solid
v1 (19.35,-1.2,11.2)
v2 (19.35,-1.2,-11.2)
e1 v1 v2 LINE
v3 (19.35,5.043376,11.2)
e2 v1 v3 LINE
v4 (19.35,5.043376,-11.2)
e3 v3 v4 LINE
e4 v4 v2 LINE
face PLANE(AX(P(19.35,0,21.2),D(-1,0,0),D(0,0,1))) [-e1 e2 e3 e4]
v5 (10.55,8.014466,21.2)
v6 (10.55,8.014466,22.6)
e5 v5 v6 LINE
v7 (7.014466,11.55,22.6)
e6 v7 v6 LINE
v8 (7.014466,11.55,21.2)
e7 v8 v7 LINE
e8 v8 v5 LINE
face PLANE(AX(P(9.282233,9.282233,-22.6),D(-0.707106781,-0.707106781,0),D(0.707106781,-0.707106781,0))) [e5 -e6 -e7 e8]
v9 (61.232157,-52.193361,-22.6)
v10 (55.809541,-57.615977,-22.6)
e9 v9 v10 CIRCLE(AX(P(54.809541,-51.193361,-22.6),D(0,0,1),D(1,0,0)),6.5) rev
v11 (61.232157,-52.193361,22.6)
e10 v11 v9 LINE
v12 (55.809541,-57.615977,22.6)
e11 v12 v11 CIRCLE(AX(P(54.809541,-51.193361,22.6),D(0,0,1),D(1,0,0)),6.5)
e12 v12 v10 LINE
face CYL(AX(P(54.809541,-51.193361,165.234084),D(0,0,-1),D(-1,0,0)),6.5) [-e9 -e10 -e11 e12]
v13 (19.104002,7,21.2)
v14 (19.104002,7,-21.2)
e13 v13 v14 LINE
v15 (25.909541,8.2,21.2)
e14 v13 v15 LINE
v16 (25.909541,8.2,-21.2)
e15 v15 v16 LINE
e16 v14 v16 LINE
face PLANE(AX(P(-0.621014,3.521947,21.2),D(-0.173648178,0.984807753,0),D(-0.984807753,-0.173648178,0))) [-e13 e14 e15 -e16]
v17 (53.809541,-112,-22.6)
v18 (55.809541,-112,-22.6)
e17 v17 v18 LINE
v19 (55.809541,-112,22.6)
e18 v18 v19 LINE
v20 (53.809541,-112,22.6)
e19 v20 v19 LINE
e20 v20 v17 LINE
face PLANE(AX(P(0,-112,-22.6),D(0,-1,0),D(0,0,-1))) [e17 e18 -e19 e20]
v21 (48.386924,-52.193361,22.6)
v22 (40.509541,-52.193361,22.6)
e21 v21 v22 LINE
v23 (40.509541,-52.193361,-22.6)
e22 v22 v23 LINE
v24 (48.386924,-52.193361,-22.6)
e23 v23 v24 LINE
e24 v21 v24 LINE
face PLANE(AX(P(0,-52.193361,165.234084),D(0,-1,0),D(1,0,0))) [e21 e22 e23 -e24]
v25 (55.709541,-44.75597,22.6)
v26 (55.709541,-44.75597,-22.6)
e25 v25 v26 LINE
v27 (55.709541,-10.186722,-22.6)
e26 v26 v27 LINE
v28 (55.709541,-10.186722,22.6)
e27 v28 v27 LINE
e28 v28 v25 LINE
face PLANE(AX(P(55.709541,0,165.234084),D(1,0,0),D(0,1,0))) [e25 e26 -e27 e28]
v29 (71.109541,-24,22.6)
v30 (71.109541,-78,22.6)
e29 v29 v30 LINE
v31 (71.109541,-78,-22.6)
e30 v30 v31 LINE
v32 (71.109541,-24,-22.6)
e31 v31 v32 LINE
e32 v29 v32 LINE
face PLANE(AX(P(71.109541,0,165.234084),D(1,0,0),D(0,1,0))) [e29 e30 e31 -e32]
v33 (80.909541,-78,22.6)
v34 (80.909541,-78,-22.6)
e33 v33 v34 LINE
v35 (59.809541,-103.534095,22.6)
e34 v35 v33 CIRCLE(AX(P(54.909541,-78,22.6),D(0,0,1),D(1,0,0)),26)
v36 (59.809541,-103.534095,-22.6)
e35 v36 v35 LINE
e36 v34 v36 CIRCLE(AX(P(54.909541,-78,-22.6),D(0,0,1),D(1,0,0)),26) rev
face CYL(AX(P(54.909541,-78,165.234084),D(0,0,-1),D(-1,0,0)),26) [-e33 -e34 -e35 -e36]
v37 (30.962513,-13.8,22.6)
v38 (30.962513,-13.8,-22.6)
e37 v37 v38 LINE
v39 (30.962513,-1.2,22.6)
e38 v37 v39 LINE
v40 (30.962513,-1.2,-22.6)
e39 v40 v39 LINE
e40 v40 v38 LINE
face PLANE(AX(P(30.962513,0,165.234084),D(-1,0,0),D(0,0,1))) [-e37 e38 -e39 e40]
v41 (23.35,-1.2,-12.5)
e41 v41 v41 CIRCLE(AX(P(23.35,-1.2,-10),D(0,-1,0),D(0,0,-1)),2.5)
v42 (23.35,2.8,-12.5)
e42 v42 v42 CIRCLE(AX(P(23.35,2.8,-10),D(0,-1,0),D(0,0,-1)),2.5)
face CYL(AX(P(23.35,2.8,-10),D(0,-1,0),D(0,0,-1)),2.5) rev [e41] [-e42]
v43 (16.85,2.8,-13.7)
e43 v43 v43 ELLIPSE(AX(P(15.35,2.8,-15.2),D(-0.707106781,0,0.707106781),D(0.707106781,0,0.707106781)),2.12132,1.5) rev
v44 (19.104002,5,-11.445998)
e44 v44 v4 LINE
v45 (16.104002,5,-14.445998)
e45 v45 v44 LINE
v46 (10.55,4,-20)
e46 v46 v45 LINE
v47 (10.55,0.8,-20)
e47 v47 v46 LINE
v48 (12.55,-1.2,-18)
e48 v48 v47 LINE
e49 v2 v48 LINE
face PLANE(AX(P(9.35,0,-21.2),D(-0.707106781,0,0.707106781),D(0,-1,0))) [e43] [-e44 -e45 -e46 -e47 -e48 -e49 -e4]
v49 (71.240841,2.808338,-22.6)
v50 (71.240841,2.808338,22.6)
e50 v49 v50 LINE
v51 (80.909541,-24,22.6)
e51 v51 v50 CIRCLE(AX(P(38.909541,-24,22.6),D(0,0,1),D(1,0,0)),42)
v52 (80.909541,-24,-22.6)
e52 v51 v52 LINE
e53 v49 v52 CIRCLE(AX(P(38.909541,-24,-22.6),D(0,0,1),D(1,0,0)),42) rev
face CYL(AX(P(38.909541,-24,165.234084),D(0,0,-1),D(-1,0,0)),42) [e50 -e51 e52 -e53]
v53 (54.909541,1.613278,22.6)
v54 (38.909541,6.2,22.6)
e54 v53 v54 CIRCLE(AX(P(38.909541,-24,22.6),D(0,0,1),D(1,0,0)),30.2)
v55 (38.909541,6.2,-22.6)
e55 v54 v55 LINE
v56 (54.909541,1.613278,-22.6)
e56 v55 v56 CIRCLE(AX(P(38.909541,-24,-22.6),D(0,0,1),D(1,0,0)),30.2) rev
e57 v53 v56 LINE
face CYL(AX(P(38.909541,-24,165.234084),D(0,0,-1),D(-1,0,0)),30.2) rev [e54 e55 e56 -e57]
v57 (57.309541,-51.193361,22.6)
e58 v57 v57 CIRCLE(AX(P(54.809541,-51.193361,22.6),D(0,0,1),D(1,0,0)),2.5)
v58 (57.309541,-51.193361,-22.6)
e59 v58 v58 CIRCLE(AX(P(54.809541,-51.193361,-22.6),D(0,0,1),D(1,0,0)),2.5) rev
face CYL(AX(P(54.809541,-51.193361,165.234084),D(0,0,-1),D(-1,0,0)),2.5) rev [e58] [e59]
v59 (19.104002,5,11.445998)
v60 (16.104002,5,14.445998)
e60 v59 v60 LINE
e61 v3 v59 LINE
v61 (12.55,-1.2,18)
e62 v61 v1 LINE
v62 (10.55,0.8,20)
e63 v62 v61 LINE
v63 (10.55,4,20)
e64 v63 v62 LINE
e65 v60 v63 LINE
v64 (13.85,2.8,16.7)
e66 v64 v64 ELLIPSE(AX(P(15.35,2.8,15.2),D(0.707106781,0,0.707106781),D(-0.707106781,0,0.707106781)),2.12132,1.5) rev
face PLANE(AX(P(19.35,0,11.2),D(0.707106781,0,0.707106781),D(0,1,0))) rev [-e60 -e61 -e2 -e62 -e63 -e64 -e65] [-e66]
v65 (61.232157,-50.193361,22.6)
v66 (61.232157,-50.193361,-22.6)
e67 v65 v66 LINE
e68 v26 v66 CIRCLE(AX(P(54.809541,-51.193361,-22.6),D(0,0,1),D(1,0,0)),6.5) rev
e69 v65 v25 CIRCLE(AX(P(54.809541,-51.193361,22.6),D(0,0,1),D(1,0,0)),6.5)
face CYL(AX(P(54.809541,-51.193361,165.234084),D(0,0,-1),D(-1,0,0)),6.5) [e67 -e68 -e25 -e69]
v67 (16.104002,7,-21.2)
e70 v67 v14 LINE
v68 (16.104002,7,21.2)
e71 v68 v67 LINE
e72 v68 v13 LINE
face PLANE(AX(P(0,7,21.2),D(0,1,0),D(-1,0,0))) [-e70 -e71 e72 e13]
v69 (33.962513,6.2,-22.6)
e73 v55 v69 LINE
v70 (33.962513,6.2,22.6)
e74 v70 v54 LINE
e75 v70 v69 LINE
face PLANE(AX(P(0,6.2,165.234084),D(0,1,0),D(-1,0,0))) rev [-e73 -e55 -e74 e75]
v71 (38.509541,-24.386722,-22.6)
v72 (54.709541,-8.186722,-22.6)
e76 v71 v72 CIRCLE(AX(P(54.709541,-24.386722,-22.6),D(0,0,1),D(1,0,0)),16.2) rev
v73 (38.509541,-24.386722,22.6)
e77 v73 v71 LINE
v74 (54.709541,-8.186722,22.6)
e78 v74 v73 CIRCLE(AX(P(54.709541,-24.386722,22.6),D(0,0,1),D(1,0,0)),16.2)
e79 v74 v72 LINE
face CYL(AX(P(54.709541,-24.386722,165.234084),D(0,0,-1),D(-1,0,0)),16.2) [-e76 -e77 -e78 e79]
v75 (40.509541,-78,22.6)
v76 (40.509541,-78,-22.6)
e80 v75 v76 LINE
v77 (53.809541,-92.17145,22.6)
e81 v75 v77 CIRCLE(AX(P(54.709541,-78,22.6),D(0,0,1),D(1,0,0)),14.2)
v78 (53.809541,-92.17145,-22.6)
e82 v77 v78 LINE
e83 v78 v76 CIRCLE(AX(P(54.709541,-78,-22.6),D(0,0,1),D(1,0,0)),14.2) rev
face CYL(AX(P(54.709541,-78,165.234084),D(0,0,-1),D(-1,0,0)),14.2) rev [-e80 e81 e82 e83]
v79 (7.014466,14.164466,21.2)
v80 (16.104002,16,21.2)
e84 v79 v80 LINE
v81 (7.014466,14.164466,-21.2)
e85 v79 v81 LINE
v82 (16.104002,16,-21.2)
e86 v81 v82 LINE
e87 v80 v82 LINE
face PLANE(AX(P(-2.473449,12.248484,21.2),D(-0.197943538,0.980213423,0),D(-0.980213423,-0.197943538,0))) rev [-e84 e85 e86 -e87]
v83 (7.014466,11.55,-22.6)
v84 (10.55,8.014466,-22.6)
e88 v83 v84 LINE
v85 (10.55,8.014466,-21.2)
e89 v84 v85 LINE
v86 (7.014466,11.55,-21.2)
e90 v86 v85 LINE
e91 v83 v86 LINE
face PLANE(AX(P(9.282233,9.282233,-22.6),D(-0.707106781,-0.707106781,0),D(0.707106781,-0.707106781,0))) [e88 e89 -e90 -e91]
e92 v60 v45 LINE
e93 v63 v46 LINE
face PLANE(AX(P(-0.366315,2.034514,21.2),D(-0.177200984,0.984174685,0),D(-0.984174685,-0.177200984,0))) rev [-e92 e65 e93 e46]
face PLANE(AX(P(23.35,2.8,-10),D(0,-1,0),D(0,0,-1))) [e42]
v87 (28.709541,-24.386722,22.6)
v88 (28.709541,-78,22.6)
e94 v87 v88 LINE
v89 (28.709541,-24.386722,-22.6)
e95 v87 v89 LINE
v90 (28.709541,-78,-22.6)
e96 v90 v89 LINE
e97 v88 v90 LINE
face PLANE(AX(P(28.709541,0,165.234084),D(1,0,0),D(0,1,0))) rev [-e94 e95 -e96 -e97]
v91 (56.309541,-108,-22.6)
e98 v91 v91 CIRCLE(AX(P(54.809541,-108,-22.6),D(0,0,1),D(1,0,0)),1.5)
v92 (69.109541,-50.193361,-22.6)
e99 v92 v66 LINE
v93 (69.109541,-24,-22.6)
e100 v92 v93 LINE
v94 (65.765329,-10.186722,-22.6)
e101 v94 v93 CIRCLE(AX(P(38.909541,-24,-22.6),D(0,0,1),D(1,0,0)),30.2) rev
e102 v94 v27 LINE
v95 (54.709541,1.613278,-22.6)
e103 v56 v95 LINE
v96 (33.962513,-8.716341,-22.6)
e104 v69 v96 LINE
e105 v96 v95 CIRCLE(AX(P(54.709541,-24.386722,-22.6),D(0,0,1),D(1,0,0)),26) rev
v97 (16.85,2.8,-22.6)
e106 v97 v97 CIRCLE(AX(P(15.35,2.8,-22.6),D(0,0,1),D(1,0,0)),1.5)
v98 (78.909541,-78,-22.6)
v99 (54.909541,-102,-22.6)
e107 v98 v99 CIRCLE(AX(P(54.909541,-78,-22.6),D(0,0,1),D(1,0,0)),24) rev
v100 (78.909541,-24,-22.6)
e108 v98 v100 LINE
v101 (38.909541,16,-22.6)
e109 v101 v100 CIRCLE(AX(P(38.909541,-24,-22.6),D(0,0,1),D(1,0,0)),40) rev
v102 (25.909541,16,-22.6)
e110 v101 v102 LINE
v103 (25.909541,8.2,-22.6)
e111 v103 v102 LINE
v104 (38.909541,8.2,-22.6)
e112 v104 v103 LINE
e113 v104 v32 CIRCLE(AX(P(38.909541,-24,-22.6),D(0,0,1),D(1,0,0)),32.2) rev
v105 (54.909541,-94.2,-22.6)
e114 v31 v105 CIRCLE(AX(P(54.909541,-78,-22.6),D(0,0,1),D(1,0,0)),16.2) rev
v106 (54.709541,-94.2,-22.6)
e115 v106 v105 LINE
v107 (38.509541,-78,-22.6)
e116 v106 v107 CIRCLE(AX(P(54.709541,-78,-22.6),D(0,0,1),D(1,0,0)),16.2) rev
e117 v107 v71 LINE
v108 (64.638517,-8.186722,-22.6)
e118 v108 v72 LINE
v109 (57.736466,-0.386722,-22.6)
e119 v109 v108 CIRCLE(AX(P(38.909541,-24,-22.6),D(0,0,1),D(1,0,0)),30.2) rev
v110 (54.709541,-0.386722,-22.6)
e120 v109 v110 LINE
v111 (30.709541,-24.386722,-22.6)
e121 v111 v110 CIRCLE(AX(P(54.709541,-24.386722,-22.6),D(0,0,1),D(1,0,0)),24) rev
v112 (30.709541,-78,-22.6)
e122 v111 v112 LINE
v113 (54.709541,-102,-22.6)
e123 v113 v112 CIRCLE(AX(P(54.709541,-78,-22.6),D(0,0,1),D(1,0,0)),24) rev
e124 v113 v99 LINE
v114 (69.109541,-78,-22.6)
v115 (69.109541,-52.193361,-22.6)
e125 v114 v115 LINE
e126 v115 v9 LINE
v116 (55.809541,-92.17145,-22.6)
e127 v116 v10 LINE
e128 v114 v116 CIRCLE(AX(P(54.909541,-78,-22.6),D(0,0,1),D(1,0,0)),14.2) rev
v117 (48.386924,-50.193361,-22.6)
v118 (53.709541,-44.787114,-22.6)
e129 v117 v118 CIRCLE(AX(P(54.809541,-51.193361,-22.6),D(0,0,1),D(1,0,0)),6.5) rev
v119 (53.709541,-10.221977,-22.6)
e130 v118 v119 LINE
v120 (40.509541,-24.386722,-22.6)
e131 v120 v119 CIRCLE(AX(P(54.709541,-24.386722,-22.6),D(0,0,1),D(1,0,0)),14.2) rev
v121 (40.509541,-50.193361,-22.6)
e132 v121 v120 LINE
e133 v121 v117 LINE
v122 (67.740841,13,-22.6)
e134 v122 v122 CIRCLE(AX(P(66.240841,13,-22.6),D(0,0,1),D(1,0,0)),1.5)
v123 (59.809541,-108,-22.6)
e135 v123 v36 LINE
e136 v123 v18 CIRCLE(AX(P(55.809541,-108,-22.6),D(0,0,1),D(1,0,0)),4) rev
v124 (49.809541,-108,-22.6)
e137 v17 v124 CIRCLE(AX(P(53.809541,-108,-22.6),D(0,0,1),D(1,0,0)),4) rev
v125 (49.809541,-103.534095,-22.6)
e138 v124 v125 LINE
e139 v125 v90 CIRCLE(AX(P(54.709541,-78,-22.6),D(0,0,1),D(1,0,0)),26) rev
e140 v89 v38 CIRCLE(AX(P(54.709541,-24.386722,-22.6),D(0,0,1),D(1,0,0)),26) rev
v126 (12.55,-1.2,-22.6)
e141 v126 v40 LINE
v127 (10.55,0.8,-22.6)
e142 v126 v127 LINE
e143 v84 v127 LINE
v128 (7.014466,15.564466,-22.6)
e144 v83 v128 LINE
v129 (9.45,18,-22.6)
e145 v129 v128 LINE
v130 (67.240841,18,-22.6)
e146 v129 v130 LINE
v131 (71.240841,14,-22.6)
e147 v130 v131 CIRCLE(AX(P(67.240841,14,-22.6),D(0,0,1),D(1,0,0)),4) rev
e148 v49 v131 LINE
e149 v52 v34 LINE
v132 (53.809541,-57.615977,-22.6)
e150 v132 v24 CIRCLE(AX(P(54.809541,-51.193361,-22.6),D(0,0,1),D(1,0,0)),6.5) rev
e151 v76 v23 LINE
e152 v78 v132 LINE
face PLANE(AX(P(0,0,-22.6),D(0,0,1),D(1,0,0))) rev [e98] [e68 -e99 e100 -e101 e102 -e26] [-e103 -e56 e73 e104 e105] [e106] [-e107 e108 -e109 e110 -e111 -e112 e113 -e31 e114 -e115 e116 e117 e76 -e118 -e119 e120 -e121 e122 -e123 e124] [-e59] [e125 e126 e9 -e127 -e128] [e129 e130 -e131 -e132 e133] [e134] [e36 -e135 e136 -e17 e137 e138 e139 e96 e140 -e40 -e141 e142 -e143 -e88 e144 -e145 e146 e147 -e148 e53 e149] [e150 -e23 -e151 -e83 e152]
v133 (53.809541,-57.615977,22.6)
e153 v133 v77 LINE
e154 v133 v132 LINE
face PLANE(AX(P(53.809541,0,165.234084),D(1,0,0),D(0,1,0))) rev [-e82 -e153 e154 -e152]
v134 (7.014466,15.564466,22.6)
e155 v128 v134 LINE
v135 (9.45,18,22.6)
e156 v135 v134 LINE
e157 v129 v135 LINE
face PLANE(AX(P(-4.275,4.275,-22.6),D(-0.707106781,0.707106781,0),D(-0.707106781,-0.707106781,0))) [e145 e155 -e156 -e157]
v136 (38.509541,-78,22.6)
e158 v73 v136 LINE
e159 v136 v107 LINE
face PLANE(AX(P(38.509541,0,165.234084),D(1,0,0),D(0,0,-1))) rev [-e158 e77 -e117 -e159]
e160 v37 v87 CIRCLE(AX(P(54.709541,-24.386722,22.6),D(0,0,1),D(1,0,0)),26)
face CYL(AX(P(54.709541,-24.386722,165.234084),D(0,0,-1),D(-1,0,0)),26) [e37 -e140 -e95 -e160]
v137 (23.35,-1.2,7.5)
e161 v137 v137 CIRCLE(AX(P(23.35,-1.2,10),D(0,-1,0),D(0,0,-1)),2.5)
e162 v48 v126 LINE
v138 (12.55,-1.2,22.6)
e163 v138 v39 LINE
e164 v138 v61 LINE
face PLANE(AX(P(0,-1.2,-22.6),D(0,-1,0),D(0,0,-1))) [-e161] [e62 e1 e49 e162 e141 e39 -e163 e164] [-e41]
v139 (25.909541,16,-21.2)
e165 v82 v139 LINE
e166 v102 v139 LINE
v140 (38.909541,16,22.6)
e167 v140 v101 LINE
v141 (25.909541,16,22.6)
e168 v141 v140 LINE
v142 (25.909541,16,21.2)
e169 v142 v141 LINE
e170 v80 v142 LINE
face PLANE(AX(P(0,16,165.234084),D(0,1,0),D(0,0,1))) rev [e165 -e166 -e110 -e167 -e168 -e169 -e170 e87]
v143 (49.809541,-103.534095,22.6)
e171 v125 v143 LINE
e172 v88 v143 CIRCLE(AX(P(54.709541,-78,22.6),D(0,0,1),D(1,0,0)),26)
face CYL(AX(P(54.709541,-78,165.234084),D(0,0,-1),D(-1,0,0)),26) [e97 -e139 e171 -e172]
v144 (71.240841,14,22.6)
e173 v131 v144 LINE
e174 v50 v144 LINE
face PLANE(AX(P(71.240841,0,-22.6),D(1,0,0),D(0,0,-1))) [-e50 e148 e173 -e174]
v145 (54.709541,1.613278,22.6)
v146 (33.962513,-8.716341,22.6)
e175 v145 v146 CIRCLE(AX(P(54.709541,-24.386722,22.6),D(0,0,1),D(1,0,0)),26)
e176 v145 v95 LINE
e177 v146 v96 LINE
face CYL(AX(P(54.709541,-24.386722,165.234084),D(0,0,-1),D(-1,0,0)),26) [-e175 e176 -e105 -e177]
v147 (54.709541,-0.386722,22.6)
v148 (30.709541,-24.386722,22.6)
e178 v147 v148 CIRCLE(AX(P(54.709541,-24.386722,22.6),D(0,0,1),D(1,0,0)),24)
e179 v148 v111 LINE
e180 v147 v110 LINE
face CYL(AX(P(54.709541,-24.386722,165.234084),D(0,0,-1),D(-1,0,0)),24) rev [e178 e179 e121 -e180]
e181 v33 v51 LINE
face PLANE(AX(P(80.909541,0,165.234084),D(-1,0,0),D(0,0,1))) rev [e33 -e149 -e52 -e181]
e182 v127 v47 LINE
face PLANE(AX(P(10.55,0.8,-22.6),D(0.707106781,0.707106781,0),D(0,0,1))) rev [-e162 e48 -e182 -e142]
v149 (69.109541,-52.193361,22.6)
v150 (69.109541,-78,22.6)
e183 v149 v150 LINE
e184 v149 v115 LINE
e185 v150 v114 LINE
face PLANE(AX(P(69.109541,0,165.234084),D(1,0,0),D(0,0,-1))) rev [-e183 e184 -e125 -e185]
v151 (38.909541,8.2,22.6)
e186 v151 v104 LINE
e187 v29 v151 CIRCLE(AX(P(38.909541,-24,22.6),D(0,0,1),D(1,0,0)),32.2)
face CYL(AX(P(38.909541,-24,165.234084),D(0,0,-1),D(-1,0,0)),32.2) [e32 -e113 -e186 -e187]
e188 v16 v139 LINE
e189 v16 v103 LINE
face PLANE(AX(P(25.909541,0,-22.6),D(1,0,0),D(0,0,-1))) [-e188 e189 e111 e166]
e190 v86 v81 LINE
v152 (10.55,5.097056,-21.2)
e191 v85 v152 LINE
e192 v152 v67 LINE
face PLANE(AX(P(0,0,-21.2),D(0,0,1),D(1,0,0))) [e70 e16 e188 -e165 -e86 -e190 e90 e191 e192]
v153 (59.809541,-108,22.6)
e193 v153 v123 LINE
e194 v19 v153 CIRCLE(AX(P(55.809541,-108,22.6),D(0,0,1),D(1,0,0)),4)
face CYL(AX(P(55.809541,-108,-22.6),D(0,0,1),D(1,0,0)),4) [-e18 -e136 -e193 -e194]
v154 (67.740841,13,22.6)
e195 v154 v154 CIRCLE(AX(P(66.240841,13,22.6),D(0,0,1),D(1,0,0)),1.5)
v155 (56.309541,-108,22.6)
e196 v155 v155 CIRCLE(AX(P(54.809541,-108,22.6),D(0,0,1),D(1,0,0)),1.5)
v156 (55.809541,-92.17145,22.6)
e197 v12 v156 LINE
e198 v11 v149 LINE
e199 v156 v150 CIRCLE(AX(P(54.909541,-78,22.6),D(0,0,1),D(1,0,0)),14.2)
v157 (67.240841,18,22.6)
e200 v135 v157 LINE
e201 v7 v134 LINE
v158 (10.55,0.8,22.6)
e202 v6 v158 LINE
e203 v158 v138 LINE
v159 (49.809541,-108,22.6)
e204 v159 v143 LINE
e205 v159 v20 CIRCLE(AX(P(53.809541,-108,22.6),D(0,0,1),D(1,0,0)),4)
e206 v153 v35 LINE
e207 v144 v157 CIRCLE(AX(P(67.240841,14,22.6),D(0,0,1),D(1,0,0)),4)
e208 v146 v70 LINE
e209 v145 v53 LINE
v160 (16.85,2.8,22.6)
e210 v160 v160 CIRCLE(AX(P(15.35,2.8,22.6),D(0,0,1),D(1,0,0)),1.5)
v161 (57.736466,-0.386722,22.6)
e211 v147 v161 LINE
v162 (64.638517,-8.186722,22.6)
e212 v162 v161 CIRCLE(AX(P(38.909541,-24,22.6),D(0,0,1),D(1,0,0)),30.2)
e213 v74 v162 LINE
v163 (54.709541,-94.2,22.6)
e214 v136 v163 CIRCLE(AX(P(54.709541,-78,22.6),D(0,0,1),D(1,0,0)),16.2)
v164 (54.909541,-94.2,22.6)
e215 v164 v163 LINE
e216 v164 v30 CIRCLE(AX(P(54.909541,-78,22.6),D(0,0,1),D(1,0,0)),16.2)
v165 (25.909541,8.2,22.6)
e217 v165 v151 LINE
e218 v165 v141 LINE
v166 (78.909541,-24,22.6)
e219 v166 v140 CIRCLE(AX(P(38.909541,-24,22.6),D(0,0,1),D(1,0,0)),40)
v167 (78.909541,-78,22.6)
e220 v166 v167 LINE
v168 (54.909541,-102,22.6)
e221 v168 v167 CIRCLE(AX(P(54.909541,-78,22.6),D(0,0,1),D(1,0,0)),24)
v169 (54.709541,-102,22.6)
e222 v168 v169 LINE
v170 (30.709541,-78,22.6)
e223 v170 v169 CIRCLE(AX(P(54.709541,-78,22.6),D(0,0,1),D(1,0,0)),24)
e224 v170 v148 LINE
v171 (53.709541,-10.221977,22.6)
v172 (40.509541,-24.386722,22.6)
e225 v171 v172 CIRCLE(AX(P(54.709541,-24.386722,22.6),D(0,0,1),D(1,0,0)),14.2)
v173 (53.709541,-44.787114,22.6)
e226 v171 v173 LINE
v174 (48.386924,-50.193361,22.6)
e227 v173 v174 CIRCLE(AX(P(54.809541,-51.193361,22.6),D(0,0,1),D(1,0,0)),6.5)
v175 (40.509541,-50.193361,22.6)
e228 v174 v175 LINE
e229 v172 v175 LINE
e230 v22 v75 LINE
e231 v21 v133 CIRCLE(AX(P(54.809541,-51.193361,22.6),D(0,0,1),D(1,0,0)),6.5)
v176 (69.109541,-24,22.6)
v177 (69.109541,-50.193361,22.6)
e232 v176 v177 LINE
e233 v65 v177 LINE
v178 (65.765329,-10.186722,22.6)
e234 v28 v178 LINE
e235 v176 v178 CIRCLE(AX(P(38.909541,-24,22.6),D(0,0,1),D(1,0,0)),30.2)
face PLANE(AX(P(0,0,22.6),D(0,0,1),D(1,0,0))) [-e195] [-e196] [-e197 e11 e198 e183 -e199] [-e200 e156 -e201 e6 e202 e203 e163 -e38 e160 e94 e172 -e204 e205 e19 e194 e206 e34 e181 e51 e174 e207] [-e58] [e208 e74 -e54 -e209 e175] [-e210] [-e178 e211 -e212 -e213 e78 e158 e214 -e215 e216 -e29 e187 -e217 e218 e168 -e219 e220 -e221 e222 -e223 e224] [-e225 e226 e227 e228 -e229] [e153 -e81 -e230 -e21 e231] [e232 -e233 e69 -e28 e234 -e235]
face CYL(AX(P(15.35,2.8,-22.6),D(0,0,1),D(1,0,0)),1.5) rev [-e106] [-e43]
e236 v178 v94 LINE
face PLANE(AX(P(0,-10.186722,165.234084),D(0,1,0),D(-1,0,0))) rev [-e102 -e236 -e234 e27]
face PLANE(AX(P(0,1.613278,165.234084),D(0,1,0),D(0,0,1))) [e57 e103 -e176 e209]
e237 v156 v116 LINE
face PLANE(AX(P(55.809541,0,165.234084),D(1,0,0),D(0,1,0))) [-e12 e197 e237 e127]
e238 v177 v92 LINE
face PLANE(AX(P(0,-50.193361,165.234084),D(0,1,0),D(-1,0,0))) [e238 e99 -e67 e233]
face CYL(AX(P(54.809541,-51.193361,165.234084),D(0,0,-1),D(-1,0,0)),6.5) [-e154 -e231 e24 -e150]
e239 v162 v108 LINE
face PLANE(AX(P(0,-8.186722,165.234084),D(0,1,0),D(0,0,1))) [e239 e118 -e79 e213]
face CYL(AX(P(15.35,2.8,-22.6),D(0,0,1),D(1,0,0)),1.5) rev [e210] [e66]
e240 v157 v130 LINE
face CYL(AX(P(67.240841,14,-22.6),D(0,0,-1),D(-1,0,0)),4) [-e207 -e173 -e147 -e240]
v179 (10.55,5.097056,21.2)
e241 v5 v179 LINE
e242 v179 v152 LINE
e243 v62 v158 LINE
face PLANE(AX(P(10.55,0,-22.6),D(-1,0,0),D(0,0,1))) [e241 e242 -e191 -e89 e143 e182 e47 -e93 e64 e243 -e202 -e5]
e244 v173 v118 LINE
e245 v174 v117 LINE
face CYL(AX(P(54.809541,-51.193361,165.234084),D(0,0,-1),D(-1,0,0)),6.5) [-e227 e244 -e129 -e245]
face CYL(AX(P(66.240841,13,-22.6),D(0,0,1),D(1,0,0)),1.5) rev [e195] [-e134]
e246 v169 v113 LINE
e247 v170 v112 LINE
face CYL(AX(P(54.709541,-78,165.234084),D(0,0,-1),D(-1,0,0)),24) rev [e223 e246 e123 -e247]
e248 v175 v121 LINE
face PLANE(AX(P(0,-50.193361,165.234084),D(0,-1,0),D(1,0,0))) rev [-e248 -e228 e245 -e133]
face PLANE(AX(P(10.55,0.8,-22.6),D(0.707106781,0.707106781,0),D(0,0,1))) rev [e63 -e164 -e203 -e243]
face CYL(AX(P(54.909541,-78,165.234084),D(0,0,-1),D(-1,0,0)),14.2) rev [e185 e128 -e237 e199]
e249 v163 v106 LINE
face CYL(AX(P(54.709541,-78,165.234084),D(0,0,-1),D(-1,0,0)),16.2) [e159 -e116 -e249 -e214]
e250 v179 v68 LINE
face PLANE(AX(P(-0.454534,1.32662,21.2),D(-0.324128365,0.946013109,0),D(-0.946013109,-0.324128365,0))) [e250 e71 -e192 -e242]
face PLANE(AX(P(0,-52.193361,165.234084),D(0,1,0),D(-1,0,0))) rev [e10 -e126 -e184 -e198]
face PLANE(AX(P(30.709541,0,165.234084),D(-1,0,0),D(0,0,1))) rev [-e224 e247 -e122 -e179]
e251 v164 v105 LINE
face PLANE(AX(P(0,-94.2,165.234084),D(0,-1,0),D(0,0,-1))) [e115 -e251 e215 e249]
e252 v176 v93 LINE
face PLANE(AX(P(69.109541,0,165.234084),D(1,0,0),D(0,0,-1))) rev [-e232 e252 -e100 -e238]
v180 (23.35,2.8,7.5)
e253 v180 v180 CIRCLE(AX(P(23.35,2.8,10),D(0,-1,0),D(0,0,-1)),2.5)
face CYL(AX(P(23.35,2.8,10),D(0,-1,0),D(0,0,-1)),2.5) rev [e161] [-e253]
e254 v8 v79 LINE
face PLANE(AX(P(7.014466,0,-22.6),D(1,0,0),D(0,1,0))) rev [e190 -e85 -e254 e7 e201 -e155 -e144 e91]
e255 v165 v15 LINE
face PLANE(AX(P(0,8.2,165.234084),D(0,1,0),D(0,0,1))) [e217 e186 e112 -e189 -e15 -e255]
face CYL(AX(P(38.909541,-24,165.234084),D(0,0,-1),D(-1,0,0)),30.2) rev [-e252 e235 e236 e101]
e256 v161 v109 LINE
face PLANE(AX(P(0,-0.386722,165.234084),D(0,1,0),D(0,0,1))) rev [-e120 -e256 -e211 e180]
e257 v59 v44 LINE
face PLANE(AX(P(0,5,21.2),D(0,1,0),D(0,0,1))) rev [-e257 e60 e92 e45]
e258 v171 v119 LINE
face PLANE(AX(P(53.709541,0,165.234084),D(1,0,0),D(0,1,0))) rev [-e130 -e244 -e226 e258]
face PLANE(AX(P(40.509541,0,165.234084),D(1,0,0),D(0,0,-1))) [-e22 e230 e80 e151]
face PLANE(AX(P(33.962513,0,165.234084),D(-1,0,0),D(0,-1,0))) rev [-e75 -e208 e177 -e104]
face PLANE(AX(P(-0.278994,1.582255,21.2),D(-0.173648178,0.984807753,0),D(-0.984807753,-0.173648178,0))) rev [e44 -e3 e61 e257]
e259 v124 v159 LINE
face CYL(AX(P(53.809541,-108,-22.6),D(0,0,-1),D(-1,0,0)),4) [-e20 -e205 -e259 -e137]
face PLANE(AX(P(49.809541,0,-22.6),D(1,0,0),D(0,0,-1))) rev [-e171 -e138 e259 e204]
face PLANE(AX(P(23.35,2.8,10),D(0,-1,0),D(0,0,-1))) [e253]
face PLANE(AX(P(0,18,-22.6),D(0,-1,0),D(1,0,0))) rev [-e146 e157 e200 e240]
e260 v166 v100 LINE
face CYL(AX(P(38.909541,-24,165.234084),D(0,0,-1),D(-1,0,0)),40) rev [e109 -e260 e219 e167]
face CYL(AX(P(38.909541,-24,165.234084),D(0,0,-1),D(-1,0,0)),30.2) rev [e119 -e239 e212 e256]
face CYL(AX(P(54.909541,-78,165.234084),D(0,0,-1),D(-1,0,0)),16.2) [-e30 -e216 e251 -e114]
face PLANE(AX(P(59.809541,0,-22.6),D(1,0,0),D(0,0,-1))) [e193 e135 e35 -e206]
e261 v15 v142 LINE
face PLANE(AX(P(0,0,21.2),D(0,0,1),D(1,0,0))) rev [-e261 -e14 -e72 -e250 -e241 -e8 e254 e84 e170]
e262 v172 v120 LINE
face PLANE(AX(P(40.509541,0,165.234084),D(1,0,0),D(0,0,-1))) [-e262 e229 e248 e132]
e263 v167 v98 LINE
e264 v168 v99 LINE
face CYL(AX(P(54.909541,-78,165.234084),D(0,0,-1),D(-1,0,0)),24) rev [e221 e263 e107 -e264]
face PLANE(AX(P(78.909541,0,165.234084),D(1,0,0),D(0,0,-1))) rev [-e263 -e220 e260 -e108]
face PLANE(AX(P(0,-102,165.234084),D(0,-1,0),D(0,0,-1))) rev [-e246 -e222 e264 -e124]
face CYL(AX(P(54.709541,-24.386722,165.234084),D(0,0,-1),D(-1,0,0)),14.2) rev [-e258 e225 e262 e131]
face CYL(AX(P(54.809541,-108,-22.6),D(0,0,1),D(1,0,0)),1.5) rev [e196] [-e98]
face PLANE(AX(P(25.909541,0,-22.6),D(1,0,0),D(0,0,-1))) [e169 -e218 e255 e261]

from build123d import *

# Parameters (mm, degrees)
BOSS_EXTRUDE6_DEPTH      = 22.6
BOSS_EXTRUDE6_DEPTH_BACK = 22.6
SKETCH9_R                = 1.5
BOSS_EXTRUDE7_START      = -22.6
BOSS_EXTRUDE7_OUTLINE_R  = 2.5
BOSS_EXTRUDE7_DEPTH      = 45.2
CUT_EXTRUDE1_DEPTH       = 21.2
CUT_EXTRUDE1_DEPTH_BACK  = 21.2
SKETCH9_30_R             = 1.5
BOSS_EXTRUDE8_DEPTH      = 22.6
BOSS_EXTRUDE8_DEPTH_BACK = 22.6
SKETCH9_31_R             = 1.5
FILLET1_R                = 4
CHAMFER1_SIZE            = 2
CHAMFER2_SIZE            = 10
SKETCH11_R               = 2.5
CUT_EXTRUDE5_DEPTH       = 4


# Read off the part's stored shape, not the designer's step: Boss-Extrude7
with BuildPart() as part:
    # Sketch9 → Boss-Extrude6 (new, two sides: drawn at the far end of the back side and taken through both)
    with BuildSketch(Plane.XY.offset(-BOSS_EXTRUDE6_DEPTH_BACK)):
        Polygon((10.55, -1.2), (30.962513099, -1.2), (30.962513099, 6.2), (25.90954056, 6.2), (25.90954056, 8.2), (25.90954056, 18), (9.45, 18), (7.014466094, 15.564466094), (7.014466094, 11.55), (10.55, 8.014466094), align=None)
        with Locations((15.35, 2.8)):
            Circle(SKETCH9_R, mode=Mode.SUBTRACT)
    extrude(amount=BOSS_EXTRUDE6_DEPTH + BOSS_EXTRUDE6_DEPTH_BACK)

    # Boss-Extrude7 outline → Boss-Extrude7 (add)
    with BuildSketch(Plane.XY.offset(BOSS_EXTRUDE7_START)):
        with BuildLine():
            Line((38.90954056, 18), (25.90954056, 18))
            Line((25.90954056, 18), (25.90954056, 16))
            Line((25.90954056, 16), (38.90954056, 16))
            ThreePointArc((38.90954056, 16), (67.193811807, 4.284271247), (78.90954056, -24))
            Line((78.90954056, -24), (78.90954056, -78))
            ThreePointArc((78.90954056, -78), (71.880103308, -94.970562748), (54.90954056, -102))
            Line((54.90954056, -102), (54.709540559, -102))
            ThreePointArc((54.709540559, -102), (37.738977811, -94.970562748), (30.709540559, -78))
            Line((30.709540559, -78), (30.709540559, -24.386722193))
            ThreePointArc((30.709540559, -24.386722193), (37.738977811, -7.416159445), (54.709540559, -0.386722193))
            Line((54.709540559, -0.386722193), (57.736465726, -0.386722193))
            ThreePointArc((57.736465726, -0.386722193), (61.526284336, -3.986931746), (64.638517317, -8.186722193))
            Line((64.638517317, -8.186722193), (54.709540559, -8.186722193))
            ThreePointArc((54.709540559, -8.186722193), (43.254410704, -12.931592338), (38.509540559, -24.386722193))
            Line((38.509540559, -24.386722193), (38.509540559, -78))
            ThreePointArc((38.509540559, -78), (43.254410704, -89.455129855), (54.709540559, -94.2))
            Line((54.709540559, -94.2), (54.90954056, -94.2))
            ThreePointArc((54.90954056, -94.2), (66.364670415, -89.455129855), (71.10954056, -78))
            Line((71.10954056, -78), (71.10954056, -24))
            ThreePointArc((71.10954056, -24), (61.678378914, -1.231161646), (38.90954056, 8.2))
            Line((38.90954056, 8.2), (25.90954056, 8.2))
            Line((25.90954056, 8.2), (25.90954056, 6.2))
            Line((25.90954056, 6.2), (30.962513099, 6.2))
            Line((30.962513099, 6.2), (30.962513099, -13.8))
            ThreePointArc((30.962513099, -13.8), (29.279020372, -18.974823911), (28.709540559, -24.386722193))
            Line((28.709540559, -24.386722193), (28.709540559, -78))
            ThreePointArc((28.709540559, -78), (36.324764249, -96.384776311), (54.709540559, -104))
            Line((54.709540559, -104), (54.90954056, -104))
            ThreePointArc((54.90954056, -104), (73.29431687, -96.384776311), (80.90954056, -78))
            Line((80.90954056, -78), (80.90954056, -24))
            ThreePointArc((80.90954056, -24), (68.608025369, 5.69848481), (38.90954056, 18))
        make_face()
        with BuildLine():
            Line((40.509540559, -78), (40.509540559, -52.193361097))
            Line((40.509540559, -52.193361097), (48.38692427, -52.193361097))
            ThreePointArc((48.38692427, -52.193361097), (50.213346482, -55.789555174), (53.809540559, -57.615977386))
            Line((53.809540559, -57.615977386), (53.809540559, -92.171450173))
            ThreePointArc((53.809540559, -92.171450173), (44.355314369, -87.717509969), (40.509540559, -78))
        make_face(mode=Mode.SUBTRACT)
        with BuildLine():
            Line((61.232156849, -52.193361097), (69.10954056, -52.193361097))
            Line((69.10954056, -52.193361097), (69.10954056, -78))
            ThreePointArc((69.10954056, -78), (65.26376675, -87.717509969), (55.80954056, -92.171450173))
            Line((55.80954056, -92.171450173), (55.809540559, -57.615977386))
            ThreePointArc((55.809540559, -57.615977386), (59.405734637, -55.789555174), (61.232156849, -52.193361097))
        make_face(mode=Mode.SUBTRACT)
        with Locations((54.809540559, -51.193361097)):
            Circle(BOSS_EXTRUDE7_OUTLINE_R, mode=Mode.SUBTRACT)
        with BuildLine():
            Line((48.38692427, -50.193361097), (40.509540559, -50.193361097))
            Line((40.509540559, -50.193361097), (40.509540559, -24.386722193))
            ThreePointArc((40.509540559, -24.386722193), (44.321085429, -14.705813145), (53.709540559, -10.221977225))
            Line((53.709540559, -10.221977225), (53.709540559, -44.787114146))
            ThreePointArc((53.709540559, -44.787114146), (50.177660219, -46.633132538), (48.38692427, -50.193361097))
        make_face(mode=Mode.SUBTRACT)
        with BuildLine():
            ThreePointArc((38.90954056, 6.2), (47.231770136, 5.030681957), (54.909540559, 1.613277807))
            Line((54.909540559, 1.613277807), (54.709540559, 1.613277807))
            ThreePointArc((54.709540559, 1.613277807), (43.121398237, -1.111951356), (33.962513099, -8.716340846))
            Line((33.962513099, -8.716340846), (33.962513099, 6.2))
            Line((33.962513099, 6.2), (38.90954056, 6.2))
        make_face(mode=Mode.SUBTRACT)
        with BuildLine():
            Line((55.709540559, -10.186722193), (65.765328692, -10.186722193))
            ThreePointArc((65.765328692, -10.186722193), (68.261583092, -16.89383372), (69.10954056, -24))
            Line((69.10954056, -24), (69.10954056, -50.193361097))
            Line((69.10954056, -50.193361097), (61.232156849, -50.193361097))
            ThreePointArc((61.232156849, -50.193361097), (59.369856551, -46.561566838), (55.709540559, -44.755970321))
            Line((55.709540559, -44.755970321), (55.709540559, -10.186722193))
        make_face(mode=Mode.SUBTRACT)
    extrude(amount=BOSS_EXTRUDE7_DEPTH)

    # Sketch9<30> → Cut-Extrude1 (cut, two sides: drawn at the far end of the back side and taken through both)
    # profile 1 of 2: a face of its own
    with BuildSketch(Plane.XY.offset(-CUT_EXTRUDE1_DEPTH_BACK)):
        Polygon((19.104002376, 5), (16.104002376, 5), (10.55, 4), (10.55, -1.2), (19.35, -1.2), (19.35, 5.043376018), align=None)
        with Locations((15.35, 2.8)):
            Circle(SKETCH9_30_R, mode=Mode.SUBTRACT)
    # profile 2 of 2: a face of its own
    with BuildSketch(Plane.XY.offset(-CUT_EXTRUDE1_DEPTH_BACK)):
        Polygon((10.55, 5.097056275), (16.104002376, 7), (19.104002376, 7), (25.90954056, 8.2), (25.90954056, 16), (16.104002376, 16), (7.014466094, 14.164466094), (7.014466094, 11.55), (10.55, 8.014466094), align=None)
    extrude(amount=CUT_EXTRUDE1_DEPTH + CUT_EXTRUDE1_DEPTH_BACK, mode=Mode.SUBTRACT)

    # Sketch9<31> → Boss-Extrude8 (add, two sides: drawn at the far end of the back side and taken through both)
    # profile 1 of 2: a face of its own
    with BuildSketch(Plane.XY.offset(-BOSS_EXTRUDE8_DEPTH_BACK)):
        with BuildLine():
            ThreePointArc((38.90954056, 18), (56.770808698, 14.012828104), (71.240841297, 2.808338118))
            Line((71.240841297, 2.808338118), (71.240841297, 8))
            Line((71.240841297, 8), (71.240841297, 18))
            Line((71.240841297, 18), (38.90954056, 18))
        make_face()
        with Locations((66.240841297, 13)):
            Circle(SKETCH9_31_R, mode=Mode.SUBTRACT)
    # profile 2 of 2: a face of its own
    with BuildSketch(Plane.XY.offset(-BOSS_EXTRUDE8_DEPTH_BACK)):
        with BuildLine():
            Line((54.709540559, -104), (54.90954056, -104))
            ThreePointArc((54.90954056, -104), (57.370590519, -103.88326164), (59.809540559, -103.534094854))
            Line((59.809540559, -103.534094854), (59.809540559, -112))
            Line((59.809540559, -112), (49.809540559, -112))
            Line((49.809540559, -112), (49.809540559, -103.534094854))
            ThreePointArc((49.809540559, -103.534094854), (52.2484906, -103.88326164), (54.709540559, -104))
        make_face()
        with Locations((54.809540559, -108)):
            Circle(SKETCH9_31_R, mode=Mode.SUBTRACT)
    extrude(amount=BOSS_EXTRUDE8_DEPTH + BOSS_EXTRUDE8_DEPTH_BACK)

    # Fillet1
    fillet1_edges = [part.edges().sort_by_distance(p)[0] for p in [
        (71.240841297, 18, 0),
        (59.809540559, -112, 0),
        (49.809540559, -112, 0),
    ]]
    fillet(fillet1_edges, radius=FILLET1_R)

    # Chamfer1
    chamfer1_edges = [part.edges().sort_by_distance(p)[0] for p in [
        (10.55, -1.2, -21.9),
        (10.55, -1.2, 21.9),
    ]]
    chamfer(chamfer1_edges, length=CHAMFER1_SIZE)

    # Chamfer2
    # the kernel refuses this chamfer: 10 mm, written as the material it adds along each edge
    with BuildSketch(Plane(origin=(19.35, -1.2, -21.2), x_dir=(0.027495876610586317, 0, 0.9996219169112968), z_dir=(0, 1, 0))) as chamfer2_piece_1_section:
        Polygon((CHAMFER2_SIZE * 0.999621916911, -CHAMFER2_SIZE * 0.0274958766106), (-CHAMFER2_SIZE * 0.0274958766106, -CHAMFER2_SIZE * 0.999621916911), (0, 0), align=None)
    chamfer2_piece_1 = extrude(amount=31.960205898, mode=Mode.PRIVATE)
    chamfer2_piece_1 = split(chamfer2_piece_1, bisect_by=Plane(origin=(10.55, 0.553309939, -18.301201582), z_dir=(1, 0, 0)), keep=Keep.TOP, mode=Mode.PRIVATE)
    chamfer2_piece_1 = split(chamfer2_piece_1, bisect_by=Plane(origin=(12.972143449, -1.622143449, -18.301201582), z_dir=(0.707106781186546, 0.7071067811865491, 0)), keep=Keep.TOP, mode=Mode.PRIVATE)
    chamfer2_piece_1 = split(chamfer2_piece_1, bisect_by=Plane(origin=(13.271329508, 6.029453592, -18.301201582), z_dir=(0.32412836516113813, -0.9460131092632744, 0)), keep=Keep.TOP, mode=Mode.PRIVATE)
    chamfer2_piece_1 = chamfer2_piece_1 - Plane(origin=(15.35, 2.8, -18.301201582), x_dir=(1, 0, 0), z_dir=(0, 0, -1)) * Cylinder(1.5, 104, mode=Mode.PRIVATE)
    chamfer2_piece_1 = split(chamfer2_piece_1, bisect_by=Plane(origin=(15.147596837, 7, -18.301201582), z_dir=(0, -1, 0)), keep=Keep.TOP, mode=Mode.PRIVATE)
    add(chamfer2_piece_1)
    with BuildSketch(Plane(origin=(19.35, -1.2, 21.2), x_dir=(-0.9996219169112968, 0, 0.027495876610586317), z_dir=(0, 1, 0))) as chamfer2_piece_2_section:
        Polygon((CHAMFER2_SIZE * 0.999621916911, -CHAMFER2_SIZE * 0.0274958766106), (-CHAMFER2_SIZE * 0.0274958766106, -CHAMFER2_SIZE * 0.999621916911), (0, 0), align=None)
    chamfer2_piece_2 = extrude(amount=31.960205898, mode=Mode.PRIVATE)
    chamfer2_piece_2 = split(chamfer2_piece_2, bisect_by=Plane(origin=(12.972143449, -1.622143449, 18.301201581), z_dir=(0.707106781186546, 0.7071067811865491, 0)), keep=Keep.TOP, mode=Mode.PRIVATE)
    chamfer2_piece_2 = split(chamfer2_piece_2, bisect_by=Plane(origin=(10.55, 0.553309939, 18.301201581), z_dir=(1, 0, 0)), keep=Keep.TOP, mode=Mode.PRIVATE)
    chamfer2_piece_2 = chamfer2_piece_2 - Plane(origin=(15.35, 2.8, 18.301201581), x_dir=(1, 0, 0), z_dir=(0, 0, -1)) * Cylinder(1.5, 104, mode=Mode.PRIVATE)
    chamfer2_piece_2 = split(chamfer2_piece_2, bisect_by=Plane(origin=(13.271329509, 6.029453592, 18.301201581), z_dir=(0.32412836516113813, -0.9460131092632744, 0)), keep=Keep.TOP, mode=Mode.PRIVATE)
    chamfer2_piece_2 = split(chamfer2_piece_2, bisect_by=Plane(origin=(15.147596837, 7, 18.301201581), z_dir=(0, -1, 0)), keep=Keep.TOP, mode=Mode.PRIVATE)
    add(chamfer2_piece_2)

    # Sketch11 → Cut-Extrude5 (cut)
    with BuildSketch(Plane.XZ.offset(1.2)):
        with Locations(Location((23.35, 10, 0), (0, 0, 270))):
            Circle(SKETCH11_R)
        with Locations(Location((23.35, -10, 0), (0, 0, 270))):
            Circle(SKETCH11_R)
    extrude(amount=-CUT_EXTRUDE5_DEPTH, mode=Mode.SUBTRACT)


solid = part.part
